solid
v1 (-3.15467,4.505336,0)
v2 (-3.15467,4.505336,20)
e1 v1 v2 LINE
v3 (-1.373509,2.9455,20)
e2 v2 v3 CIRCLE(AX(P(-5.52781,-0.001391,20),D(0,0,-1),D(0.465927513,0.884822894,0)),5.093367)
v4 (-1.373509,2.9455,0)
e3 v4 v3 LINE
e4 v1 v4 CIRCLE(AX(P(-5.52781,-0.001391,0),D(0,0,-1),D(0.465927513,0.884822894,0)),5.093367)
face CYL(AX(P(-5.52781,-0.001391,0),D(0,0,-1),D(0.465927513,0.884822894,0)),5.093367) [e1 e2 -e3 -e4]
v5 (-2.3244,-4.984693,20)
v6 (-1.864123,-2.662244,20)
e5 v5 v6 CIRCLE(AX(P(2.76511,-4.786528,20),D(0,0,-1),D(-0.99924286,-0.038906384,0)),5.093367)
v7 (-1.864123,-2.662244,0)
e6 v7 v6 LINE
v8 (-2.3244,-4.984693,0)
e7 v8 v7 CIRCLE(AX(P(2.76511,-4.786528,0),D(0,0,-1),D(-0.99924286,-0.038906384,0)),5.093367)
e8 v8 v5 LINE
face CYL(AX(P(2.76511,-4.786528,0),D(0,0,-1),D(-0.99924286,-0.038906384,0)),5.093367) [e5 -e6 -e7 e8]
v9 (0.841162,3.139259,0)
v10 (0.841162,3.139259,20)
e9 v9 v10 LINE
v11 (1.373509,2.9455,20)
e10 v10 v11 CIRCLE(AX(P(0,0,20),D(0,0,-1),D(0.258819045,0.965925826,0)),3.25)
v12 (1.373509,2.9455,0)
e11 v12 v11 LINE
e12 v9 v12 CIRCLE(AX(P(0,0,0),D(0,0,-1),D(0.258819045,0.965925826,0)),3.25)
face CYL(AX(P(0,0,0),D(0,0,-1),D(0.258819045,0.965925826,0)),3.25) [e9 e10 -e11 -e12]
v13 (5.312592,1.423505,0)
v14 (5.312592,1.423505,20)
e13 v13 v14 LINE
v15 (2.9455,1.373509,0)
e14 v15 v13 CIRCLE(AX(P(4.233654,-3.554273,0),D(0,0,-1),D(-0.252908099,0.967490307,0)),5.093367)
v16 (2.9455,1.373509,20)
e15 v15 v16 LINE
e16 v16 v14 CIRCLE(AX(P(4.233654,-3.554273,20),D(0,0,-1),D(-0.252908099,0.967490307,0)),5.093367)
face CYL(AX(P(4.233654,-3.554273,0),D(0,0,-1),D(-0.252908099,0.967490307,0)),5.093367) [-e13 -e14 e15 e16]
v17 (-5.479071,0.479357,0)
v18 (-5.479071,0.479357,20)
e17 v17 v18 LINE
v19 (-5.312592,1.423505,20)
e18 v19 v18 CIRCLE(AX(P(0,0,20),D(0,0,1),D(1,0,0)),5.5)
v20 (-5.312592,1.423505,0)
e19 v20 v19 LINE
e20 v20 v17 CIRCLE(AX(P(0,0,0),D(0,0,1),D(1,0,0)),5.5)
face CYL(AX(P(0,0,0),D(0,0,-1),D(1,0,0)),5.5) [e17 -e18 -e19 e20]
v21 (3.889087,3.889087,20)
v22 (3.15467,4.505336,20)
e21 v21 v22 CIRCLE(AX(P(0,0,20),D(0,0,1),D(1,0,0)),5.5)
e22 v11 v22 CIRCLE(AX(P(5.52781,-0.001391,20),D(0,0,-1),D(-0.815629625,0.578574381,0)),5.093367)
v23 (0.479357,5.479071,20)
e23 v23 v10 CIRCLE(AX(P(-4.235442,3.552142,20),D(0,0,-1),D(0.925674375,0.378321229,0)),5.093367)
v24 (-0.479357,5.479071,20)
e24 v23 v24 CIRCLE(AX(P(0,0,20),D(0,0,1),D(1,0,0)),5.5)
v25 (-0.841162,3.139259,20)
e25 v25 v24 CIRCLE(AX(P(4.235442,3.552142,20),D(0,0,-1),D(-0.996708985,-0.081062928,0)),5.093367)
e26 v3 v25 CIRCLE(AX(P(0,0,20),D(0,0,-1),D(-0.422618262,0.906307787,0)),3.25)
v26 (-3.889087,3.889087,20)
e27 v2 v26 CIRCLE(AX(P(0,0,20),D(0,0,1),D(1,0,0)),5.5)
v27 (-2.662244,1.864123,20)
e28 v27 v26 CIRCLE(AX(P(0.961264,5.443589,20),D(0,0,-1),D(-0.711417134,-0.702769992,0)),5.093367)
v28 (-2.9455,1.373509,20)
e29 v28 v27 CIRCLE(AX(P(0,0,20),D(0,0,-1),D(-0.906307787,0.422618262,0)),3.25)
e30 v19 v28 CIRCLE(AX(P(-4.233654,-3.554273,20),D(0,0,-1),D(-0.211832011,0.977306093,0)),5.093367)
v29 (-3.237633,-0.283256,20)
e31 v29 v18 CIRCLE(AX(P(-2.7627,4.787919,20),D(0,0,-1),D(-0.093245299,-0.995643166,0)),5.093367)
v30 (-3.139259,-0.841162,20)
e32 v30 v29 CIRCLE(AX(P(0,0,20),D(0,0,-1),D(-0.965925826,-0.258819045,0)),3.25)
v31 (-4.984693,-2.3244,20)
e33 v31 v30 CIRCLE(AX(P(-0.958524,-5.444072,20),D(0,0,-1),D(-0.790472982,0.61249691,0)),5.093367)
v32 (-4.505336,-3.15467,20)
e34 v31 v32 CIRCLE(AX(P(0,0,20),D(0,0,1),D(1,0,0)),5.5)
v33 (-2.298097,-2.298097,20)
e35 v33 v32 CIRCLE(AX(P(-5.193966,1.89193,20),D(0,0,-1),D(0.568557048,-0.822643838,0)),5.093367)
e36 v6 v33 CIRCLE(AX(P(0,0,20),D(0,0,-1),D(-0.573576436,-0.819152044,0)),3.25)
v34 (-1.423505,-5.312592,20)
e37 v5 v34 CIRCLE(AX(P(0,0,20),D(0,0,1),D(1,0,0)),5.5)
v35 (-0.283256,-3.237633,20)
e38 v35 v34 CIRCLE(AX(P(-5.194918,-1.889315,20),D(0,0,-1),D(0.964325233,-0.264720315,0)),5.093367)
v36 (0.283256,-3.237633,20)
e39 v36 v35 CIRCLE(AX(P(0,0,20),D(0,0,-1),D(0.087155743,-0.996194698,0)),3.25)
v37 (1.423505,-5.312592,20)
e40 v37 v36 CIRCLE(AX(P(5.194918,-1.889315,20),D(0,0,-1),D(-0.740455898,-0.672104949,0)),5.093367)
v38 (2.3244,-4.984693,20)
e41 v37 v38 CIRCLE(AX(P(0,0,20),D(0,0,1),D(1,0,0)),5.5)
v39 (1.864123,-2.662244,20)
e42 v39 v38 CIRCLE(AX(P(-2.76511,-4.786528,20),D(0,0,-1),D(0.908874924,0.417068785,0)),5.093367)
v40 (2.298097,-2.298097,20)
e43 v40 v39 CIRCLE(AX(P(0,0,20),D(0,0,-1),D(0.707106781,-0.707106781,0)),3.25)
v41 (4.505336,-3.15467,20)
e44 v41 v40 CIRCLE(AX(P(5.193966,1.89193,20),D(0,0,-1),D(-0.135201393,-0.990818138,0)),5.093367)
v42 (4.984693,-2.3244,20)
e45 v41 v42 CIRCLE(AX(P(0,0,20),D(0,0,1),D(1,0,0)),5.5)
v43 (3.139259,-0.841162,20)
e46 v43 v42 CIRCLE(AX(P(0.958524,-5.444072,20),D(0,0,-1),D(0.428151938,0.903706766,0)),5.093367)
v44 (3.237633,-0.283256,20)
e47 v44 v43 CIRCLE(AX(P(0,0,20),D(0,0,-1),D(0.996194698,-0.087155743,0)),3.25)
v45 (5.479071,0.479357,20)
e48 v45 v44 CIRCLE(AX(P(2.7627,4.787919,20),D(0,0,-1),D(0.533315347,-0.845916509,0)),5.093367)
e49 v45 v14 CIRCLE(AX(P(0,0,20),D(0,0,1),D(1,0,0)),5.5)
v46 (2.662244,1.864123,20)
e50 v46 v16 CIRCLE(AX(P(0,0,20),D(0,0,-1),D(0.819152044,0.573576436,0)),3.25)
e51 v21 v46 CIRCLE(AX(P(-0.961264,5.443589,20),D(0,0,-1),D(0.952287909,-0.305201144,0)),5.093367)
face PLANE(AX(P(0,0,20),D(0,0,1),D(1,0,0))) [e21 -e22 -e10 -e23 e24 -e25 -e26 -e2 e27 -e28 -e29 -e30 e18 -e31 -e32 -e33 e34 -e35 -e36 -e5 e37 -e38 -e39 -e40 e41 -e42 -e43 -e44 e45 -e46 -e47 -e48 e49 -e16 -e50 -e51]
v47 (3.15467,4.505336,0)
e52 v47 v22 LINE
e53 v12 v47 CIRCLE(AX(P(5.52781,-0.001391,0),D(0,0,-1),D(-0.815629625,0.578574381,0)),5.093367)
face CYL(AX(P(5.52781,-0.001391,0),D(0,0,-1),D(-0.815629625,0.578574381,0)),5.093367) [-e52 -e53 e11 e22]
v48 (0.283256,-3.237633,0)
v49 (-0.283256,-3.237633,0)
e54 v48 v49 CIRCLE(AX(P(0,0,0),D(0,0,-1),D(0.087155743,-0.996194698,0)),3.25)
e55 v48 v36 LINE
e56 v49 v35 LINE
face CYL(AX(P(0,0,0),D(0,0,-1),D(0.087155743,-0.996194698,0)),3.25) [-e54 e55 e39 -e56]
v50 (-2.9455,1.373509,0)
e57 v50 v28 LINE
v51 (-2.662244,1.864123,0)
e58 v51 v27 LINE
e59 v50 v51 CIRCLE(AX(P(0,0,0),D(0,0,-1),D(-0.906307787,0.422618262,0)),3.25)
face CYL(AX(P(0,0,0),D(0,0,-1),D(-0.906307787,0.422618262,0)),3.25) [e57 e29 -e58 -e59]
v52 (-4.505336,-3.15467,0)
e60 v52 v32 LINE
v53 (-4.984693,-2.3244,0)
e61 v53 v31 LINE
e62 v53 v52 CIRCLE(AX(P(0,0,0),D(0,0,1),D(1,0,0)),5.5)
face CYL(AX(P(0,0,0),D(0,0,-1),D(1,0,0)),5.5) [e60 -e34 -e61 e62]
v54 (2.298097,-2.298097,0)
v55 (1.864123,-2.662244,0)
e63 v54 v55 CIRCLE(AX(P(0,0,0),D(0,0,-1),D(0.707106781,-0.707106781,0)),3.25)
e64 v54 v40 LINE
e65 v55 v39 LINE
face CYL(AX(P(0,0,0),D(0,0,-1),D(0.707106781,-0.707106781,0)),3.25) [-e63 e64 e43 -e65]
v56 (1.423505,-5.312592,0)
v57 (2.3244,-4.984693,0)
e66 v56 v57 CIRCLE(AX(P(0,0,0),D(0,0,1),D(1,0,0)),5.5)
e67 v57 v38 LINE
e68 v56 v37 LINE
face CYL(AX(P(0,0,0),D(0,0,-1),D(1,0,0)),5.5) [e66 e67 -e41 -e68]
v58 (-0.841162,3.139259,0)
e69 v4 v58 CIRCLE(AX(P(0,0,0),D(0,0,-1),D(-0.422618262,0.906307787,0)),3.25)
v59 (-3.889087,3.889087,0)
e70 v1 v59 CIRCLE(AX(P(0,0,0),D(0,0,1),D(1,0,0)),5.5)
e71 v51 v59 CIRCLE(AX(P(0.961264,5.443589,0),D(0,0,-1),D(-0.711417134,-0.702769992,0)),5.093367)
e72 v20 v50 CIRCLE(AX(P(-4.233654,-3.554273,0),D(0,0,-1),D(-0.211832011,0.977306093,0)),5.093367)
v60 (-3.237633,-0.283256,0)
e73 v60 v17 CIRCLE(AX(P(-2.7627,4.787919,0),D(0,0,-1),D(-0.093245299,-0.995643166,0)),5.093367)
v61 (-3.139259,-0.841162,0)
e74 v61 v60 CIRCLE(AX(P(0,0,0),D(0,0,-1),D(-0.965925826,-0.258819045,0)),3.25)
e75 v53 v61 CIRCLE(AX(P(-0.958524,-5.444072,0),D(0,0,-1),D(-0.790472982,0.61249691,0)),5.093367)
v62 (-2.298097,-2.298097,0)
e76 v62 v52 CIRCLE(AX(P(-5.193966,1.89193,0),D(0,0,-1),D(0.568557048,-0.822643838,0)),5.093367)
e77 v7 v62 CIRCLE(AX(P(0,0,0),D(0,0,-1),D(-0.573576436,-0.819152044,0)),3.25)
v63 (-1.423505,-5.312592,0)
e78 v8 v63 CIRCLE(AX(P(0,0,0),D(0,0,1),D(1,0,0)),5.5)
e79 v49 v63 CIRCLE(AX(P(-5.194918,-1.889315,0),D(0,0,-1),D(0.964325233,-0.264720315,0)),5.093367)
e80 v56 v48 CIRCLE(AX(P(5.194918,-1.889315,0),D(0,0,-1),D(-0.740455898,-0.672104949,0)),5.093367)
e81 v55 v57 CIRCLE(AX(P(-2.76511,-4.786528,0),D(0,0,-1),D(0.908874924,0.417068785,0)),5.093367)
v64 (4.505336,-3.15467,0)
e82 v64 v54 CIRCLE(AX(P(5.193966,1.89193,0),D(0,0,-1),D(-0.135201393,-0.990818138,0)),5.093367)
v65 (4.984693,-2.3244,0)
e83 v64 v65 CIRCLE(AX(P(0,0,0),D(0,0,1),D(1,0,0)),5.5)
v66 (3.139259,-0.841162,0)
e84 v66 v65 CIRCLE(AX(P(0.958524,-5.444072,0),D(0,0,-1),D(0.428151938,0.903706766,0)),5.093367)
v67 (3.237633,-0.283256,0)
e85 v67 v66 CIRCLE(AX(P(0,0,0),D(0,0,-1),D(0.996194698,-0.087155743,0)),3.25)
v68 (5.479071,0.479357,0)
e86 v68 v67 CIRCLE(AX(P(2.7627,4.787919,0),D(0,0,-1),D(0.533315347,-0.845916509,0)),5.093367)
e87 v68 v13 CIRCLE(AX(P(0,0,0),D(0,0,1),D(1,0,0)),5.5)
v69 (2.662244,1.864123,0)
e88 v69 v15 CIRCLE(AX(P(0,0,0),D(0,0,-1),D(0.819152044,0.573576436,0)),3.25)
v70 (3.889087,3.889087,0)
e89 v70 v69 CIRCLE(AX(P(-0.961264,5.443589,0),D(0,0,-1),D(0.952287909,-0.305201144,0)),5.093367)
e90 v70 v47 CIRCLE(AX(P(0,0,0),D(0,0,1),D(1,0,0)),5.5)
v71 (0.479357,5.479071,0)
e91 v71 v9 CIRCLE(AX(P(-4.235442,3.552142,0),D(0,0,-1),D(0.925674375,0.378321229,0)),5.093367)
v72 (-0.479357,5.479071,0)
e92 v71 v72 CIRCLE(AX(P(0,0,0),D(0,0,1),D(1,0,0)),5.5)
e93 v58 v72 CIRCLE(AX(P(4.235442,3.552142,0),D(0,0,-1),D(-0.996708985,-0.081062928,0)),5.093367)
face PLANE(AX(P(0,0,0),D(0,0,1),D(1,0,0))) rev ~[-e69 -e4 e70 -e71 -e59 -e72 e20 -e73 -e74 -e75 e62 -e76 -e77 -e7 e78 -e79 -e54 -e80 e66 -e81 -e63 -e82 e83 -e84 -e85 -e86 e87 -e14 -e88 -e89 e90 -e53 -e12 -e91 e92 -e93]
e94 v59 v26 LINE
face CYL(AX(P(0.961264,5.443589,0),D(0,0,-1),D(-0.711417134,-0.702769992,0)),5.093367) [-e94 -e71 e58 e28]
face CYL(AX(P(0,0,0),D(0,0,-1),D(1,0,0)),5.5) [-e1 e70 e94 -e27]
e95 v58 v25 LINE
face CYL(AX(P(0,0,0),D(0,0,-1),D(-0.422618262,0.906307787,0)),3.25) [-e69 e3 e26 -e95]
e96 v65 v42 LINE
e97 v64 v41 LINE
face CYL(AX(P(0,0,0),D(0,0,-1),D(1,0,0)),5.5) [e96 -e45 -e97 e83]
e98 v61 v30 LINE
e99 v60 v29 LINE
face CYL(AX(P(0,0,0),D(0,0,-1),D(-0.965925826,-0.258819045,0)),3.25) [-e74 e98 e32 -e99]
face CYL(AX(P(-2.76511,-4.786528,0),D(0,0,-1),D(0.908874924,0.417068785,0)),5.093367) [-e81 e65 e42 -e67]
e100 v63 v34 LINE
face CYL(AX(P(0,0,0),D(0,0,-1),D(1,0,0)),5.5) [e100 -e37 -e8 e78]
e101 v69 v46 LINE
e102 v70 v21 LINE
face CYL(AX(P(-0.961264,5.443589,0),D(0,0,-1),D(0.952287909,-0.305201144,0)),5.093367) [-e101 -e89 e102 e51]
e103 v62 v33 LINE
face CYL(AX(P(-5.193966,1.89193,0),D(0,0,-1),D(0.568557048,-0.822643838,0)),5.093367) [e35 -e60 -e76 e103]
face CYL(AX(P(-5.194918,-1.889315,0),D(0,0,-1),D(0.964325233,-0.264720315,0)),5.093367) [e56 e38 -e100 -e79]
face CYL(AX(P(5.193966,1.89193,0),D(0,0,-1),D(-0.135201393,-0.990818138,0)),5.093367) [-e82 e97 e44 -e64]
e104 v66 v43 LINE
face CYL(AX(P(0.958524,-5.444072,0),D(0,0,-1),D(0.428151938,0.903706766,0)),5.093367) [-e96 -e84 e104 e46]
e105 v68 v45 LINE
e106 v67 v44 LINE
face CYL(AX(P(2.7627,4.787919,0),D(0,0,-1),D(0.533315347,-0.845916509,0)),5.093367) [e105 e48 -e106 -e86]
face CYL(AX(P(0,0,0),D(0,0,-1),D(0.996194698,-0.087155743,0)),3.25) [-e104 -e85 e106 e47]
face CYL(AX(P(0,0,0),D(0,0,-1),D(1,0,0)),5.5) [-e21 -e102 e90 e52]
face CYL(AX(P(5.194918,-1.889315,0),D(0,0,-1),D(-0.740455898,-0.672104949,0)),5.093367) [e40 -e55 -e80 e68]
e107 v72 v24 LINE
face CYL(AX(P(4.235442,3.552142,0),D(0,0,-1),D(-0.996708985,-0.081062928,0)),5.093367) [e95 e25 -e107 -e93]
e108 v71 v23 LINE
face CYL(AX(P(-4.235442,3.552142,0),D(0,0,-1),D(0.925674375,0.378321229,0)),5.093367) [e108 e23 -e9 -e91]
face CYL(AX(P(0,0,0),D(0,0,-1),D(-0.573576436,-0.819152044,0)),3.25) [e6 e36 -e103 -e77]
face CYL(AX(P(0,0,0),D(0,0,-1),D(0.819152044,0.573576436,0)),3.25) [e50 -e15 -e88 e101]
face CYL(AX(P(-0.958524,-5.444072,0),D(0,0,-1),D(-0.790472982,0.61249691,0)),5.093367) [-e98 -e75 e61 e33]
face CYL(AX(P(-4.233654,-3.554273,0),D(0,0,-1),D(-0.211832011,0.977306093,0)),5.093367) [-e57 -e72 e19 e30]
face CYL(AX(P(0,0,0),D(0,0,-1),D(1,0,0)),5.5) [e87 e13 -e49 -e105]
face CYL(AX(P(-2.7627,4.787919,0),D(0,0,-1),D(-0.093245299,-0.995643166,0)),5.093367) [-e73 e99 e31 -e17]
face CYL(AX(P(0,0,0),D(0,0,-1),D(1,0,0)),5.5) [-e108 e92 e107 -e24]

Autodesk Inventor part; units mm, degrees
sketch "Sketch1" plane through (0, 0, 0) normal (0, 0, 1) x (1, 0, 0)
  circle A0 centre (0, 0) radius 5.5
  dimension "d0" = 11
extrude "Extrusion1" add sketch "Sketch1" along normal blind 20
ref_plane "Work Plane2" through (0, 0, 10) normal (0, 0, 1) x (1, 0, 0)
sketch "Sketch2" plane through (0, 0, 0) normal (0, 0, -1) x (-1, 0, 0)
  circle A0 centre (0, 0) radius 5.5 projected
  circle A1 centre (0, 0) radius 4.5
  dimension "d3" = 9
surface extrude "ピッチ円直径" sketch "Sketch2" against normal through all shown no curves A1
ref_plane "Work Plane8" through (0, 0, 0) normal (0.9396926, 0.3420201, 0) x (0, 0, 1)
ref_plane "Work Plane9" through (0, 0, 0) normal (1, 0, 0) x (0, 1, 0)
spur gear teeth "平歯車" teeth 9 pitch diameter 9 tip diameter 11 root diameter 6.5 face width 20 start plane through (0, 0, 0) normal (0, 0, -1) x (-1, 0, 0)
sketch "スケッチ3" plane through (0, 0, 20) normal (0, 0, 1) x (1, 0, 0)
  arc A0 (-3.8891, 3.8891) -> (-2.6622, 1.8641) centre (0.9613, 5.4436) ccw projected
  arc A1 (-2.6622, 1.8641) -> (-2.9455, 1.3735) centre (0, 0) ccw projected
  arc A2 (-2.9455, 1.3735) -> (-5.3126, 1.4235) centre (-4.2337, -3.5543) ccw projected
  arc A3 (-5.3126, 1.4235) -> (-5.4791, 0.4794) centre (0, 0) ccw projected
  arc A4 (-5.4791, 0.4794) -> (-3.2376, -0.2833) centre (-2.7627, 4.7879) ccw projected
  arc A5 (-3.2376, -0.2833) -> (-3.1393, -0.8412) centre (0, 0) ccw projected
  arc A6 (-3.1393, -0.8412) -> (-4.9847, -2.3244) centre (-0.9585, -5.4441) ccw projected
  arc A7 (-4.9847, -2.3244) -> (-4.5053, -3.1547) centre (0, 0) ccw projected
  arc A8 (-4.5053, -3.1547) -> (-2.2981, -2.2981) centre (-5.194, 1.8919) ccw projected
  arc A9 (-2.2981, -2.2981) -> (-1.8641, -2.6622) centre (0, 0) ccw projected
  arc A10 (-1.8641, -2.6622) -> (-2.3244, -4.9847) centre (2.7651, -4.7865) ccw projected
  arc A11 (-2.3244, -4.9847) -> (-1.4235, -5.3126) centre (0, 0) ccw projected
  arc A12 (-1.4235, -5.3126) -> (-0.2833, -3.2376) centre (-5.1949, -1.8893) ccw projected
  arc A13 (-0.2833, -3.2376) -> (0.2833, -3.2376) centre (0, 0) ccw projected
  arc A14 (0.2833, -3.2376) -> (1.4235, -5.3126) centre (5.1949, -1.8893) ccw projected
  arc A15 (1.4235, -5.3126) -> (2.3244, -4.9847) centre (0, 0) ccw projected
  arc A16 (2.3244, -4.9847) -> (1.8641, -2.6622) centre (-2.7651, -4.7865) ccw projected
  arc A17 (1.8641, -2.6622) -> (2.2981, -2.2981) centre (0, 0) ccw projected
  arc A18 (2.2981, -2.2981) -> (4.5053, -3.1547) centre (5.194, 1.8919) ccw projected
  arc A19 (4.5053, -3.1547) -> (4.9847, -2.3244) centre (0, 0) ccw projected
  arc A20 (4.9847, -2.3244) -> (3.1393, -0.8412) centre (0.9585, -5.4441) ccw projected
  arc A21 (3.1393, -0.8412) -> (3.2376, -0.2833) centre (0, 0) ccw projected
  arc A22 (3.2376, -0.2833) -> (5.4791, 0.4794) centre (2.7627, 4.7879) ccw projected
  arc A23 (5.4791, 0.4794) -> (5.3126, 1.4235) centre (0, 0) ccw projected
  arc A24 (5.3126, 1.4235) -> (2.9455, 1.3735) centre (4.2337, -3.5543) ccw projected
  arc A25 (2.9455, 1.3735) -> (2.6622, 1.8641) centre (0, 0) ccw projected
  arc A26 (2.6622, 1.8641) -> (3.8891, 3.8891) centre (-0.9613, 5.4436) ccw projected
  arc A27 (3.8891, 3.8891) -> (3.1547, 4.5053) centre (0, 0) ccw projected
  arc A28 (3.1547, 4.5053) -> (1.3735, 2.9455) centre (5.5278, -0.0014) ccw projected
  arc A29 (1.3735, 2.9455) -> (0.8412, 3.1393) centre (0, 0) ccw projected
  arc A30 (0.8412, 3.1393) -> (0.4794, 5.4791) centre (-4.2354, 3.5521) ccw projected
  arc A31 (0.4794, 5.4791) -> (-0.4794, 5.4791) centre (0, 0) ccw projected
  arc A32 (-0.4794, 5.4791) -> (-0.8412, 3.1393) centre (4.2354, 3.5521) ccw projected
  arc A33 (-0.8412, 3.1393) -> (-1.3735, 2.9455) centre (0, 0) ccw projected
  arc A34 (-1.3735, 2.9455) -> (-3.1547, 4.5053) centre (-5.5278, -0.0014) ccw projected
  arc A35 (-3.1547, 4.5053) -> (-3.8891, 3.8891) centre (0, 0) ccw projected
equation "\"d0\" = da_da"
equation "\"d1\" = da_b"
equation "\"d3\" = da_dw"
equation "\"da_da\" = 11"
equation "\"da_b\" = 20"
equation "\"da_dw\" = 9"
properties part number "平歯車1" material "Steel"
